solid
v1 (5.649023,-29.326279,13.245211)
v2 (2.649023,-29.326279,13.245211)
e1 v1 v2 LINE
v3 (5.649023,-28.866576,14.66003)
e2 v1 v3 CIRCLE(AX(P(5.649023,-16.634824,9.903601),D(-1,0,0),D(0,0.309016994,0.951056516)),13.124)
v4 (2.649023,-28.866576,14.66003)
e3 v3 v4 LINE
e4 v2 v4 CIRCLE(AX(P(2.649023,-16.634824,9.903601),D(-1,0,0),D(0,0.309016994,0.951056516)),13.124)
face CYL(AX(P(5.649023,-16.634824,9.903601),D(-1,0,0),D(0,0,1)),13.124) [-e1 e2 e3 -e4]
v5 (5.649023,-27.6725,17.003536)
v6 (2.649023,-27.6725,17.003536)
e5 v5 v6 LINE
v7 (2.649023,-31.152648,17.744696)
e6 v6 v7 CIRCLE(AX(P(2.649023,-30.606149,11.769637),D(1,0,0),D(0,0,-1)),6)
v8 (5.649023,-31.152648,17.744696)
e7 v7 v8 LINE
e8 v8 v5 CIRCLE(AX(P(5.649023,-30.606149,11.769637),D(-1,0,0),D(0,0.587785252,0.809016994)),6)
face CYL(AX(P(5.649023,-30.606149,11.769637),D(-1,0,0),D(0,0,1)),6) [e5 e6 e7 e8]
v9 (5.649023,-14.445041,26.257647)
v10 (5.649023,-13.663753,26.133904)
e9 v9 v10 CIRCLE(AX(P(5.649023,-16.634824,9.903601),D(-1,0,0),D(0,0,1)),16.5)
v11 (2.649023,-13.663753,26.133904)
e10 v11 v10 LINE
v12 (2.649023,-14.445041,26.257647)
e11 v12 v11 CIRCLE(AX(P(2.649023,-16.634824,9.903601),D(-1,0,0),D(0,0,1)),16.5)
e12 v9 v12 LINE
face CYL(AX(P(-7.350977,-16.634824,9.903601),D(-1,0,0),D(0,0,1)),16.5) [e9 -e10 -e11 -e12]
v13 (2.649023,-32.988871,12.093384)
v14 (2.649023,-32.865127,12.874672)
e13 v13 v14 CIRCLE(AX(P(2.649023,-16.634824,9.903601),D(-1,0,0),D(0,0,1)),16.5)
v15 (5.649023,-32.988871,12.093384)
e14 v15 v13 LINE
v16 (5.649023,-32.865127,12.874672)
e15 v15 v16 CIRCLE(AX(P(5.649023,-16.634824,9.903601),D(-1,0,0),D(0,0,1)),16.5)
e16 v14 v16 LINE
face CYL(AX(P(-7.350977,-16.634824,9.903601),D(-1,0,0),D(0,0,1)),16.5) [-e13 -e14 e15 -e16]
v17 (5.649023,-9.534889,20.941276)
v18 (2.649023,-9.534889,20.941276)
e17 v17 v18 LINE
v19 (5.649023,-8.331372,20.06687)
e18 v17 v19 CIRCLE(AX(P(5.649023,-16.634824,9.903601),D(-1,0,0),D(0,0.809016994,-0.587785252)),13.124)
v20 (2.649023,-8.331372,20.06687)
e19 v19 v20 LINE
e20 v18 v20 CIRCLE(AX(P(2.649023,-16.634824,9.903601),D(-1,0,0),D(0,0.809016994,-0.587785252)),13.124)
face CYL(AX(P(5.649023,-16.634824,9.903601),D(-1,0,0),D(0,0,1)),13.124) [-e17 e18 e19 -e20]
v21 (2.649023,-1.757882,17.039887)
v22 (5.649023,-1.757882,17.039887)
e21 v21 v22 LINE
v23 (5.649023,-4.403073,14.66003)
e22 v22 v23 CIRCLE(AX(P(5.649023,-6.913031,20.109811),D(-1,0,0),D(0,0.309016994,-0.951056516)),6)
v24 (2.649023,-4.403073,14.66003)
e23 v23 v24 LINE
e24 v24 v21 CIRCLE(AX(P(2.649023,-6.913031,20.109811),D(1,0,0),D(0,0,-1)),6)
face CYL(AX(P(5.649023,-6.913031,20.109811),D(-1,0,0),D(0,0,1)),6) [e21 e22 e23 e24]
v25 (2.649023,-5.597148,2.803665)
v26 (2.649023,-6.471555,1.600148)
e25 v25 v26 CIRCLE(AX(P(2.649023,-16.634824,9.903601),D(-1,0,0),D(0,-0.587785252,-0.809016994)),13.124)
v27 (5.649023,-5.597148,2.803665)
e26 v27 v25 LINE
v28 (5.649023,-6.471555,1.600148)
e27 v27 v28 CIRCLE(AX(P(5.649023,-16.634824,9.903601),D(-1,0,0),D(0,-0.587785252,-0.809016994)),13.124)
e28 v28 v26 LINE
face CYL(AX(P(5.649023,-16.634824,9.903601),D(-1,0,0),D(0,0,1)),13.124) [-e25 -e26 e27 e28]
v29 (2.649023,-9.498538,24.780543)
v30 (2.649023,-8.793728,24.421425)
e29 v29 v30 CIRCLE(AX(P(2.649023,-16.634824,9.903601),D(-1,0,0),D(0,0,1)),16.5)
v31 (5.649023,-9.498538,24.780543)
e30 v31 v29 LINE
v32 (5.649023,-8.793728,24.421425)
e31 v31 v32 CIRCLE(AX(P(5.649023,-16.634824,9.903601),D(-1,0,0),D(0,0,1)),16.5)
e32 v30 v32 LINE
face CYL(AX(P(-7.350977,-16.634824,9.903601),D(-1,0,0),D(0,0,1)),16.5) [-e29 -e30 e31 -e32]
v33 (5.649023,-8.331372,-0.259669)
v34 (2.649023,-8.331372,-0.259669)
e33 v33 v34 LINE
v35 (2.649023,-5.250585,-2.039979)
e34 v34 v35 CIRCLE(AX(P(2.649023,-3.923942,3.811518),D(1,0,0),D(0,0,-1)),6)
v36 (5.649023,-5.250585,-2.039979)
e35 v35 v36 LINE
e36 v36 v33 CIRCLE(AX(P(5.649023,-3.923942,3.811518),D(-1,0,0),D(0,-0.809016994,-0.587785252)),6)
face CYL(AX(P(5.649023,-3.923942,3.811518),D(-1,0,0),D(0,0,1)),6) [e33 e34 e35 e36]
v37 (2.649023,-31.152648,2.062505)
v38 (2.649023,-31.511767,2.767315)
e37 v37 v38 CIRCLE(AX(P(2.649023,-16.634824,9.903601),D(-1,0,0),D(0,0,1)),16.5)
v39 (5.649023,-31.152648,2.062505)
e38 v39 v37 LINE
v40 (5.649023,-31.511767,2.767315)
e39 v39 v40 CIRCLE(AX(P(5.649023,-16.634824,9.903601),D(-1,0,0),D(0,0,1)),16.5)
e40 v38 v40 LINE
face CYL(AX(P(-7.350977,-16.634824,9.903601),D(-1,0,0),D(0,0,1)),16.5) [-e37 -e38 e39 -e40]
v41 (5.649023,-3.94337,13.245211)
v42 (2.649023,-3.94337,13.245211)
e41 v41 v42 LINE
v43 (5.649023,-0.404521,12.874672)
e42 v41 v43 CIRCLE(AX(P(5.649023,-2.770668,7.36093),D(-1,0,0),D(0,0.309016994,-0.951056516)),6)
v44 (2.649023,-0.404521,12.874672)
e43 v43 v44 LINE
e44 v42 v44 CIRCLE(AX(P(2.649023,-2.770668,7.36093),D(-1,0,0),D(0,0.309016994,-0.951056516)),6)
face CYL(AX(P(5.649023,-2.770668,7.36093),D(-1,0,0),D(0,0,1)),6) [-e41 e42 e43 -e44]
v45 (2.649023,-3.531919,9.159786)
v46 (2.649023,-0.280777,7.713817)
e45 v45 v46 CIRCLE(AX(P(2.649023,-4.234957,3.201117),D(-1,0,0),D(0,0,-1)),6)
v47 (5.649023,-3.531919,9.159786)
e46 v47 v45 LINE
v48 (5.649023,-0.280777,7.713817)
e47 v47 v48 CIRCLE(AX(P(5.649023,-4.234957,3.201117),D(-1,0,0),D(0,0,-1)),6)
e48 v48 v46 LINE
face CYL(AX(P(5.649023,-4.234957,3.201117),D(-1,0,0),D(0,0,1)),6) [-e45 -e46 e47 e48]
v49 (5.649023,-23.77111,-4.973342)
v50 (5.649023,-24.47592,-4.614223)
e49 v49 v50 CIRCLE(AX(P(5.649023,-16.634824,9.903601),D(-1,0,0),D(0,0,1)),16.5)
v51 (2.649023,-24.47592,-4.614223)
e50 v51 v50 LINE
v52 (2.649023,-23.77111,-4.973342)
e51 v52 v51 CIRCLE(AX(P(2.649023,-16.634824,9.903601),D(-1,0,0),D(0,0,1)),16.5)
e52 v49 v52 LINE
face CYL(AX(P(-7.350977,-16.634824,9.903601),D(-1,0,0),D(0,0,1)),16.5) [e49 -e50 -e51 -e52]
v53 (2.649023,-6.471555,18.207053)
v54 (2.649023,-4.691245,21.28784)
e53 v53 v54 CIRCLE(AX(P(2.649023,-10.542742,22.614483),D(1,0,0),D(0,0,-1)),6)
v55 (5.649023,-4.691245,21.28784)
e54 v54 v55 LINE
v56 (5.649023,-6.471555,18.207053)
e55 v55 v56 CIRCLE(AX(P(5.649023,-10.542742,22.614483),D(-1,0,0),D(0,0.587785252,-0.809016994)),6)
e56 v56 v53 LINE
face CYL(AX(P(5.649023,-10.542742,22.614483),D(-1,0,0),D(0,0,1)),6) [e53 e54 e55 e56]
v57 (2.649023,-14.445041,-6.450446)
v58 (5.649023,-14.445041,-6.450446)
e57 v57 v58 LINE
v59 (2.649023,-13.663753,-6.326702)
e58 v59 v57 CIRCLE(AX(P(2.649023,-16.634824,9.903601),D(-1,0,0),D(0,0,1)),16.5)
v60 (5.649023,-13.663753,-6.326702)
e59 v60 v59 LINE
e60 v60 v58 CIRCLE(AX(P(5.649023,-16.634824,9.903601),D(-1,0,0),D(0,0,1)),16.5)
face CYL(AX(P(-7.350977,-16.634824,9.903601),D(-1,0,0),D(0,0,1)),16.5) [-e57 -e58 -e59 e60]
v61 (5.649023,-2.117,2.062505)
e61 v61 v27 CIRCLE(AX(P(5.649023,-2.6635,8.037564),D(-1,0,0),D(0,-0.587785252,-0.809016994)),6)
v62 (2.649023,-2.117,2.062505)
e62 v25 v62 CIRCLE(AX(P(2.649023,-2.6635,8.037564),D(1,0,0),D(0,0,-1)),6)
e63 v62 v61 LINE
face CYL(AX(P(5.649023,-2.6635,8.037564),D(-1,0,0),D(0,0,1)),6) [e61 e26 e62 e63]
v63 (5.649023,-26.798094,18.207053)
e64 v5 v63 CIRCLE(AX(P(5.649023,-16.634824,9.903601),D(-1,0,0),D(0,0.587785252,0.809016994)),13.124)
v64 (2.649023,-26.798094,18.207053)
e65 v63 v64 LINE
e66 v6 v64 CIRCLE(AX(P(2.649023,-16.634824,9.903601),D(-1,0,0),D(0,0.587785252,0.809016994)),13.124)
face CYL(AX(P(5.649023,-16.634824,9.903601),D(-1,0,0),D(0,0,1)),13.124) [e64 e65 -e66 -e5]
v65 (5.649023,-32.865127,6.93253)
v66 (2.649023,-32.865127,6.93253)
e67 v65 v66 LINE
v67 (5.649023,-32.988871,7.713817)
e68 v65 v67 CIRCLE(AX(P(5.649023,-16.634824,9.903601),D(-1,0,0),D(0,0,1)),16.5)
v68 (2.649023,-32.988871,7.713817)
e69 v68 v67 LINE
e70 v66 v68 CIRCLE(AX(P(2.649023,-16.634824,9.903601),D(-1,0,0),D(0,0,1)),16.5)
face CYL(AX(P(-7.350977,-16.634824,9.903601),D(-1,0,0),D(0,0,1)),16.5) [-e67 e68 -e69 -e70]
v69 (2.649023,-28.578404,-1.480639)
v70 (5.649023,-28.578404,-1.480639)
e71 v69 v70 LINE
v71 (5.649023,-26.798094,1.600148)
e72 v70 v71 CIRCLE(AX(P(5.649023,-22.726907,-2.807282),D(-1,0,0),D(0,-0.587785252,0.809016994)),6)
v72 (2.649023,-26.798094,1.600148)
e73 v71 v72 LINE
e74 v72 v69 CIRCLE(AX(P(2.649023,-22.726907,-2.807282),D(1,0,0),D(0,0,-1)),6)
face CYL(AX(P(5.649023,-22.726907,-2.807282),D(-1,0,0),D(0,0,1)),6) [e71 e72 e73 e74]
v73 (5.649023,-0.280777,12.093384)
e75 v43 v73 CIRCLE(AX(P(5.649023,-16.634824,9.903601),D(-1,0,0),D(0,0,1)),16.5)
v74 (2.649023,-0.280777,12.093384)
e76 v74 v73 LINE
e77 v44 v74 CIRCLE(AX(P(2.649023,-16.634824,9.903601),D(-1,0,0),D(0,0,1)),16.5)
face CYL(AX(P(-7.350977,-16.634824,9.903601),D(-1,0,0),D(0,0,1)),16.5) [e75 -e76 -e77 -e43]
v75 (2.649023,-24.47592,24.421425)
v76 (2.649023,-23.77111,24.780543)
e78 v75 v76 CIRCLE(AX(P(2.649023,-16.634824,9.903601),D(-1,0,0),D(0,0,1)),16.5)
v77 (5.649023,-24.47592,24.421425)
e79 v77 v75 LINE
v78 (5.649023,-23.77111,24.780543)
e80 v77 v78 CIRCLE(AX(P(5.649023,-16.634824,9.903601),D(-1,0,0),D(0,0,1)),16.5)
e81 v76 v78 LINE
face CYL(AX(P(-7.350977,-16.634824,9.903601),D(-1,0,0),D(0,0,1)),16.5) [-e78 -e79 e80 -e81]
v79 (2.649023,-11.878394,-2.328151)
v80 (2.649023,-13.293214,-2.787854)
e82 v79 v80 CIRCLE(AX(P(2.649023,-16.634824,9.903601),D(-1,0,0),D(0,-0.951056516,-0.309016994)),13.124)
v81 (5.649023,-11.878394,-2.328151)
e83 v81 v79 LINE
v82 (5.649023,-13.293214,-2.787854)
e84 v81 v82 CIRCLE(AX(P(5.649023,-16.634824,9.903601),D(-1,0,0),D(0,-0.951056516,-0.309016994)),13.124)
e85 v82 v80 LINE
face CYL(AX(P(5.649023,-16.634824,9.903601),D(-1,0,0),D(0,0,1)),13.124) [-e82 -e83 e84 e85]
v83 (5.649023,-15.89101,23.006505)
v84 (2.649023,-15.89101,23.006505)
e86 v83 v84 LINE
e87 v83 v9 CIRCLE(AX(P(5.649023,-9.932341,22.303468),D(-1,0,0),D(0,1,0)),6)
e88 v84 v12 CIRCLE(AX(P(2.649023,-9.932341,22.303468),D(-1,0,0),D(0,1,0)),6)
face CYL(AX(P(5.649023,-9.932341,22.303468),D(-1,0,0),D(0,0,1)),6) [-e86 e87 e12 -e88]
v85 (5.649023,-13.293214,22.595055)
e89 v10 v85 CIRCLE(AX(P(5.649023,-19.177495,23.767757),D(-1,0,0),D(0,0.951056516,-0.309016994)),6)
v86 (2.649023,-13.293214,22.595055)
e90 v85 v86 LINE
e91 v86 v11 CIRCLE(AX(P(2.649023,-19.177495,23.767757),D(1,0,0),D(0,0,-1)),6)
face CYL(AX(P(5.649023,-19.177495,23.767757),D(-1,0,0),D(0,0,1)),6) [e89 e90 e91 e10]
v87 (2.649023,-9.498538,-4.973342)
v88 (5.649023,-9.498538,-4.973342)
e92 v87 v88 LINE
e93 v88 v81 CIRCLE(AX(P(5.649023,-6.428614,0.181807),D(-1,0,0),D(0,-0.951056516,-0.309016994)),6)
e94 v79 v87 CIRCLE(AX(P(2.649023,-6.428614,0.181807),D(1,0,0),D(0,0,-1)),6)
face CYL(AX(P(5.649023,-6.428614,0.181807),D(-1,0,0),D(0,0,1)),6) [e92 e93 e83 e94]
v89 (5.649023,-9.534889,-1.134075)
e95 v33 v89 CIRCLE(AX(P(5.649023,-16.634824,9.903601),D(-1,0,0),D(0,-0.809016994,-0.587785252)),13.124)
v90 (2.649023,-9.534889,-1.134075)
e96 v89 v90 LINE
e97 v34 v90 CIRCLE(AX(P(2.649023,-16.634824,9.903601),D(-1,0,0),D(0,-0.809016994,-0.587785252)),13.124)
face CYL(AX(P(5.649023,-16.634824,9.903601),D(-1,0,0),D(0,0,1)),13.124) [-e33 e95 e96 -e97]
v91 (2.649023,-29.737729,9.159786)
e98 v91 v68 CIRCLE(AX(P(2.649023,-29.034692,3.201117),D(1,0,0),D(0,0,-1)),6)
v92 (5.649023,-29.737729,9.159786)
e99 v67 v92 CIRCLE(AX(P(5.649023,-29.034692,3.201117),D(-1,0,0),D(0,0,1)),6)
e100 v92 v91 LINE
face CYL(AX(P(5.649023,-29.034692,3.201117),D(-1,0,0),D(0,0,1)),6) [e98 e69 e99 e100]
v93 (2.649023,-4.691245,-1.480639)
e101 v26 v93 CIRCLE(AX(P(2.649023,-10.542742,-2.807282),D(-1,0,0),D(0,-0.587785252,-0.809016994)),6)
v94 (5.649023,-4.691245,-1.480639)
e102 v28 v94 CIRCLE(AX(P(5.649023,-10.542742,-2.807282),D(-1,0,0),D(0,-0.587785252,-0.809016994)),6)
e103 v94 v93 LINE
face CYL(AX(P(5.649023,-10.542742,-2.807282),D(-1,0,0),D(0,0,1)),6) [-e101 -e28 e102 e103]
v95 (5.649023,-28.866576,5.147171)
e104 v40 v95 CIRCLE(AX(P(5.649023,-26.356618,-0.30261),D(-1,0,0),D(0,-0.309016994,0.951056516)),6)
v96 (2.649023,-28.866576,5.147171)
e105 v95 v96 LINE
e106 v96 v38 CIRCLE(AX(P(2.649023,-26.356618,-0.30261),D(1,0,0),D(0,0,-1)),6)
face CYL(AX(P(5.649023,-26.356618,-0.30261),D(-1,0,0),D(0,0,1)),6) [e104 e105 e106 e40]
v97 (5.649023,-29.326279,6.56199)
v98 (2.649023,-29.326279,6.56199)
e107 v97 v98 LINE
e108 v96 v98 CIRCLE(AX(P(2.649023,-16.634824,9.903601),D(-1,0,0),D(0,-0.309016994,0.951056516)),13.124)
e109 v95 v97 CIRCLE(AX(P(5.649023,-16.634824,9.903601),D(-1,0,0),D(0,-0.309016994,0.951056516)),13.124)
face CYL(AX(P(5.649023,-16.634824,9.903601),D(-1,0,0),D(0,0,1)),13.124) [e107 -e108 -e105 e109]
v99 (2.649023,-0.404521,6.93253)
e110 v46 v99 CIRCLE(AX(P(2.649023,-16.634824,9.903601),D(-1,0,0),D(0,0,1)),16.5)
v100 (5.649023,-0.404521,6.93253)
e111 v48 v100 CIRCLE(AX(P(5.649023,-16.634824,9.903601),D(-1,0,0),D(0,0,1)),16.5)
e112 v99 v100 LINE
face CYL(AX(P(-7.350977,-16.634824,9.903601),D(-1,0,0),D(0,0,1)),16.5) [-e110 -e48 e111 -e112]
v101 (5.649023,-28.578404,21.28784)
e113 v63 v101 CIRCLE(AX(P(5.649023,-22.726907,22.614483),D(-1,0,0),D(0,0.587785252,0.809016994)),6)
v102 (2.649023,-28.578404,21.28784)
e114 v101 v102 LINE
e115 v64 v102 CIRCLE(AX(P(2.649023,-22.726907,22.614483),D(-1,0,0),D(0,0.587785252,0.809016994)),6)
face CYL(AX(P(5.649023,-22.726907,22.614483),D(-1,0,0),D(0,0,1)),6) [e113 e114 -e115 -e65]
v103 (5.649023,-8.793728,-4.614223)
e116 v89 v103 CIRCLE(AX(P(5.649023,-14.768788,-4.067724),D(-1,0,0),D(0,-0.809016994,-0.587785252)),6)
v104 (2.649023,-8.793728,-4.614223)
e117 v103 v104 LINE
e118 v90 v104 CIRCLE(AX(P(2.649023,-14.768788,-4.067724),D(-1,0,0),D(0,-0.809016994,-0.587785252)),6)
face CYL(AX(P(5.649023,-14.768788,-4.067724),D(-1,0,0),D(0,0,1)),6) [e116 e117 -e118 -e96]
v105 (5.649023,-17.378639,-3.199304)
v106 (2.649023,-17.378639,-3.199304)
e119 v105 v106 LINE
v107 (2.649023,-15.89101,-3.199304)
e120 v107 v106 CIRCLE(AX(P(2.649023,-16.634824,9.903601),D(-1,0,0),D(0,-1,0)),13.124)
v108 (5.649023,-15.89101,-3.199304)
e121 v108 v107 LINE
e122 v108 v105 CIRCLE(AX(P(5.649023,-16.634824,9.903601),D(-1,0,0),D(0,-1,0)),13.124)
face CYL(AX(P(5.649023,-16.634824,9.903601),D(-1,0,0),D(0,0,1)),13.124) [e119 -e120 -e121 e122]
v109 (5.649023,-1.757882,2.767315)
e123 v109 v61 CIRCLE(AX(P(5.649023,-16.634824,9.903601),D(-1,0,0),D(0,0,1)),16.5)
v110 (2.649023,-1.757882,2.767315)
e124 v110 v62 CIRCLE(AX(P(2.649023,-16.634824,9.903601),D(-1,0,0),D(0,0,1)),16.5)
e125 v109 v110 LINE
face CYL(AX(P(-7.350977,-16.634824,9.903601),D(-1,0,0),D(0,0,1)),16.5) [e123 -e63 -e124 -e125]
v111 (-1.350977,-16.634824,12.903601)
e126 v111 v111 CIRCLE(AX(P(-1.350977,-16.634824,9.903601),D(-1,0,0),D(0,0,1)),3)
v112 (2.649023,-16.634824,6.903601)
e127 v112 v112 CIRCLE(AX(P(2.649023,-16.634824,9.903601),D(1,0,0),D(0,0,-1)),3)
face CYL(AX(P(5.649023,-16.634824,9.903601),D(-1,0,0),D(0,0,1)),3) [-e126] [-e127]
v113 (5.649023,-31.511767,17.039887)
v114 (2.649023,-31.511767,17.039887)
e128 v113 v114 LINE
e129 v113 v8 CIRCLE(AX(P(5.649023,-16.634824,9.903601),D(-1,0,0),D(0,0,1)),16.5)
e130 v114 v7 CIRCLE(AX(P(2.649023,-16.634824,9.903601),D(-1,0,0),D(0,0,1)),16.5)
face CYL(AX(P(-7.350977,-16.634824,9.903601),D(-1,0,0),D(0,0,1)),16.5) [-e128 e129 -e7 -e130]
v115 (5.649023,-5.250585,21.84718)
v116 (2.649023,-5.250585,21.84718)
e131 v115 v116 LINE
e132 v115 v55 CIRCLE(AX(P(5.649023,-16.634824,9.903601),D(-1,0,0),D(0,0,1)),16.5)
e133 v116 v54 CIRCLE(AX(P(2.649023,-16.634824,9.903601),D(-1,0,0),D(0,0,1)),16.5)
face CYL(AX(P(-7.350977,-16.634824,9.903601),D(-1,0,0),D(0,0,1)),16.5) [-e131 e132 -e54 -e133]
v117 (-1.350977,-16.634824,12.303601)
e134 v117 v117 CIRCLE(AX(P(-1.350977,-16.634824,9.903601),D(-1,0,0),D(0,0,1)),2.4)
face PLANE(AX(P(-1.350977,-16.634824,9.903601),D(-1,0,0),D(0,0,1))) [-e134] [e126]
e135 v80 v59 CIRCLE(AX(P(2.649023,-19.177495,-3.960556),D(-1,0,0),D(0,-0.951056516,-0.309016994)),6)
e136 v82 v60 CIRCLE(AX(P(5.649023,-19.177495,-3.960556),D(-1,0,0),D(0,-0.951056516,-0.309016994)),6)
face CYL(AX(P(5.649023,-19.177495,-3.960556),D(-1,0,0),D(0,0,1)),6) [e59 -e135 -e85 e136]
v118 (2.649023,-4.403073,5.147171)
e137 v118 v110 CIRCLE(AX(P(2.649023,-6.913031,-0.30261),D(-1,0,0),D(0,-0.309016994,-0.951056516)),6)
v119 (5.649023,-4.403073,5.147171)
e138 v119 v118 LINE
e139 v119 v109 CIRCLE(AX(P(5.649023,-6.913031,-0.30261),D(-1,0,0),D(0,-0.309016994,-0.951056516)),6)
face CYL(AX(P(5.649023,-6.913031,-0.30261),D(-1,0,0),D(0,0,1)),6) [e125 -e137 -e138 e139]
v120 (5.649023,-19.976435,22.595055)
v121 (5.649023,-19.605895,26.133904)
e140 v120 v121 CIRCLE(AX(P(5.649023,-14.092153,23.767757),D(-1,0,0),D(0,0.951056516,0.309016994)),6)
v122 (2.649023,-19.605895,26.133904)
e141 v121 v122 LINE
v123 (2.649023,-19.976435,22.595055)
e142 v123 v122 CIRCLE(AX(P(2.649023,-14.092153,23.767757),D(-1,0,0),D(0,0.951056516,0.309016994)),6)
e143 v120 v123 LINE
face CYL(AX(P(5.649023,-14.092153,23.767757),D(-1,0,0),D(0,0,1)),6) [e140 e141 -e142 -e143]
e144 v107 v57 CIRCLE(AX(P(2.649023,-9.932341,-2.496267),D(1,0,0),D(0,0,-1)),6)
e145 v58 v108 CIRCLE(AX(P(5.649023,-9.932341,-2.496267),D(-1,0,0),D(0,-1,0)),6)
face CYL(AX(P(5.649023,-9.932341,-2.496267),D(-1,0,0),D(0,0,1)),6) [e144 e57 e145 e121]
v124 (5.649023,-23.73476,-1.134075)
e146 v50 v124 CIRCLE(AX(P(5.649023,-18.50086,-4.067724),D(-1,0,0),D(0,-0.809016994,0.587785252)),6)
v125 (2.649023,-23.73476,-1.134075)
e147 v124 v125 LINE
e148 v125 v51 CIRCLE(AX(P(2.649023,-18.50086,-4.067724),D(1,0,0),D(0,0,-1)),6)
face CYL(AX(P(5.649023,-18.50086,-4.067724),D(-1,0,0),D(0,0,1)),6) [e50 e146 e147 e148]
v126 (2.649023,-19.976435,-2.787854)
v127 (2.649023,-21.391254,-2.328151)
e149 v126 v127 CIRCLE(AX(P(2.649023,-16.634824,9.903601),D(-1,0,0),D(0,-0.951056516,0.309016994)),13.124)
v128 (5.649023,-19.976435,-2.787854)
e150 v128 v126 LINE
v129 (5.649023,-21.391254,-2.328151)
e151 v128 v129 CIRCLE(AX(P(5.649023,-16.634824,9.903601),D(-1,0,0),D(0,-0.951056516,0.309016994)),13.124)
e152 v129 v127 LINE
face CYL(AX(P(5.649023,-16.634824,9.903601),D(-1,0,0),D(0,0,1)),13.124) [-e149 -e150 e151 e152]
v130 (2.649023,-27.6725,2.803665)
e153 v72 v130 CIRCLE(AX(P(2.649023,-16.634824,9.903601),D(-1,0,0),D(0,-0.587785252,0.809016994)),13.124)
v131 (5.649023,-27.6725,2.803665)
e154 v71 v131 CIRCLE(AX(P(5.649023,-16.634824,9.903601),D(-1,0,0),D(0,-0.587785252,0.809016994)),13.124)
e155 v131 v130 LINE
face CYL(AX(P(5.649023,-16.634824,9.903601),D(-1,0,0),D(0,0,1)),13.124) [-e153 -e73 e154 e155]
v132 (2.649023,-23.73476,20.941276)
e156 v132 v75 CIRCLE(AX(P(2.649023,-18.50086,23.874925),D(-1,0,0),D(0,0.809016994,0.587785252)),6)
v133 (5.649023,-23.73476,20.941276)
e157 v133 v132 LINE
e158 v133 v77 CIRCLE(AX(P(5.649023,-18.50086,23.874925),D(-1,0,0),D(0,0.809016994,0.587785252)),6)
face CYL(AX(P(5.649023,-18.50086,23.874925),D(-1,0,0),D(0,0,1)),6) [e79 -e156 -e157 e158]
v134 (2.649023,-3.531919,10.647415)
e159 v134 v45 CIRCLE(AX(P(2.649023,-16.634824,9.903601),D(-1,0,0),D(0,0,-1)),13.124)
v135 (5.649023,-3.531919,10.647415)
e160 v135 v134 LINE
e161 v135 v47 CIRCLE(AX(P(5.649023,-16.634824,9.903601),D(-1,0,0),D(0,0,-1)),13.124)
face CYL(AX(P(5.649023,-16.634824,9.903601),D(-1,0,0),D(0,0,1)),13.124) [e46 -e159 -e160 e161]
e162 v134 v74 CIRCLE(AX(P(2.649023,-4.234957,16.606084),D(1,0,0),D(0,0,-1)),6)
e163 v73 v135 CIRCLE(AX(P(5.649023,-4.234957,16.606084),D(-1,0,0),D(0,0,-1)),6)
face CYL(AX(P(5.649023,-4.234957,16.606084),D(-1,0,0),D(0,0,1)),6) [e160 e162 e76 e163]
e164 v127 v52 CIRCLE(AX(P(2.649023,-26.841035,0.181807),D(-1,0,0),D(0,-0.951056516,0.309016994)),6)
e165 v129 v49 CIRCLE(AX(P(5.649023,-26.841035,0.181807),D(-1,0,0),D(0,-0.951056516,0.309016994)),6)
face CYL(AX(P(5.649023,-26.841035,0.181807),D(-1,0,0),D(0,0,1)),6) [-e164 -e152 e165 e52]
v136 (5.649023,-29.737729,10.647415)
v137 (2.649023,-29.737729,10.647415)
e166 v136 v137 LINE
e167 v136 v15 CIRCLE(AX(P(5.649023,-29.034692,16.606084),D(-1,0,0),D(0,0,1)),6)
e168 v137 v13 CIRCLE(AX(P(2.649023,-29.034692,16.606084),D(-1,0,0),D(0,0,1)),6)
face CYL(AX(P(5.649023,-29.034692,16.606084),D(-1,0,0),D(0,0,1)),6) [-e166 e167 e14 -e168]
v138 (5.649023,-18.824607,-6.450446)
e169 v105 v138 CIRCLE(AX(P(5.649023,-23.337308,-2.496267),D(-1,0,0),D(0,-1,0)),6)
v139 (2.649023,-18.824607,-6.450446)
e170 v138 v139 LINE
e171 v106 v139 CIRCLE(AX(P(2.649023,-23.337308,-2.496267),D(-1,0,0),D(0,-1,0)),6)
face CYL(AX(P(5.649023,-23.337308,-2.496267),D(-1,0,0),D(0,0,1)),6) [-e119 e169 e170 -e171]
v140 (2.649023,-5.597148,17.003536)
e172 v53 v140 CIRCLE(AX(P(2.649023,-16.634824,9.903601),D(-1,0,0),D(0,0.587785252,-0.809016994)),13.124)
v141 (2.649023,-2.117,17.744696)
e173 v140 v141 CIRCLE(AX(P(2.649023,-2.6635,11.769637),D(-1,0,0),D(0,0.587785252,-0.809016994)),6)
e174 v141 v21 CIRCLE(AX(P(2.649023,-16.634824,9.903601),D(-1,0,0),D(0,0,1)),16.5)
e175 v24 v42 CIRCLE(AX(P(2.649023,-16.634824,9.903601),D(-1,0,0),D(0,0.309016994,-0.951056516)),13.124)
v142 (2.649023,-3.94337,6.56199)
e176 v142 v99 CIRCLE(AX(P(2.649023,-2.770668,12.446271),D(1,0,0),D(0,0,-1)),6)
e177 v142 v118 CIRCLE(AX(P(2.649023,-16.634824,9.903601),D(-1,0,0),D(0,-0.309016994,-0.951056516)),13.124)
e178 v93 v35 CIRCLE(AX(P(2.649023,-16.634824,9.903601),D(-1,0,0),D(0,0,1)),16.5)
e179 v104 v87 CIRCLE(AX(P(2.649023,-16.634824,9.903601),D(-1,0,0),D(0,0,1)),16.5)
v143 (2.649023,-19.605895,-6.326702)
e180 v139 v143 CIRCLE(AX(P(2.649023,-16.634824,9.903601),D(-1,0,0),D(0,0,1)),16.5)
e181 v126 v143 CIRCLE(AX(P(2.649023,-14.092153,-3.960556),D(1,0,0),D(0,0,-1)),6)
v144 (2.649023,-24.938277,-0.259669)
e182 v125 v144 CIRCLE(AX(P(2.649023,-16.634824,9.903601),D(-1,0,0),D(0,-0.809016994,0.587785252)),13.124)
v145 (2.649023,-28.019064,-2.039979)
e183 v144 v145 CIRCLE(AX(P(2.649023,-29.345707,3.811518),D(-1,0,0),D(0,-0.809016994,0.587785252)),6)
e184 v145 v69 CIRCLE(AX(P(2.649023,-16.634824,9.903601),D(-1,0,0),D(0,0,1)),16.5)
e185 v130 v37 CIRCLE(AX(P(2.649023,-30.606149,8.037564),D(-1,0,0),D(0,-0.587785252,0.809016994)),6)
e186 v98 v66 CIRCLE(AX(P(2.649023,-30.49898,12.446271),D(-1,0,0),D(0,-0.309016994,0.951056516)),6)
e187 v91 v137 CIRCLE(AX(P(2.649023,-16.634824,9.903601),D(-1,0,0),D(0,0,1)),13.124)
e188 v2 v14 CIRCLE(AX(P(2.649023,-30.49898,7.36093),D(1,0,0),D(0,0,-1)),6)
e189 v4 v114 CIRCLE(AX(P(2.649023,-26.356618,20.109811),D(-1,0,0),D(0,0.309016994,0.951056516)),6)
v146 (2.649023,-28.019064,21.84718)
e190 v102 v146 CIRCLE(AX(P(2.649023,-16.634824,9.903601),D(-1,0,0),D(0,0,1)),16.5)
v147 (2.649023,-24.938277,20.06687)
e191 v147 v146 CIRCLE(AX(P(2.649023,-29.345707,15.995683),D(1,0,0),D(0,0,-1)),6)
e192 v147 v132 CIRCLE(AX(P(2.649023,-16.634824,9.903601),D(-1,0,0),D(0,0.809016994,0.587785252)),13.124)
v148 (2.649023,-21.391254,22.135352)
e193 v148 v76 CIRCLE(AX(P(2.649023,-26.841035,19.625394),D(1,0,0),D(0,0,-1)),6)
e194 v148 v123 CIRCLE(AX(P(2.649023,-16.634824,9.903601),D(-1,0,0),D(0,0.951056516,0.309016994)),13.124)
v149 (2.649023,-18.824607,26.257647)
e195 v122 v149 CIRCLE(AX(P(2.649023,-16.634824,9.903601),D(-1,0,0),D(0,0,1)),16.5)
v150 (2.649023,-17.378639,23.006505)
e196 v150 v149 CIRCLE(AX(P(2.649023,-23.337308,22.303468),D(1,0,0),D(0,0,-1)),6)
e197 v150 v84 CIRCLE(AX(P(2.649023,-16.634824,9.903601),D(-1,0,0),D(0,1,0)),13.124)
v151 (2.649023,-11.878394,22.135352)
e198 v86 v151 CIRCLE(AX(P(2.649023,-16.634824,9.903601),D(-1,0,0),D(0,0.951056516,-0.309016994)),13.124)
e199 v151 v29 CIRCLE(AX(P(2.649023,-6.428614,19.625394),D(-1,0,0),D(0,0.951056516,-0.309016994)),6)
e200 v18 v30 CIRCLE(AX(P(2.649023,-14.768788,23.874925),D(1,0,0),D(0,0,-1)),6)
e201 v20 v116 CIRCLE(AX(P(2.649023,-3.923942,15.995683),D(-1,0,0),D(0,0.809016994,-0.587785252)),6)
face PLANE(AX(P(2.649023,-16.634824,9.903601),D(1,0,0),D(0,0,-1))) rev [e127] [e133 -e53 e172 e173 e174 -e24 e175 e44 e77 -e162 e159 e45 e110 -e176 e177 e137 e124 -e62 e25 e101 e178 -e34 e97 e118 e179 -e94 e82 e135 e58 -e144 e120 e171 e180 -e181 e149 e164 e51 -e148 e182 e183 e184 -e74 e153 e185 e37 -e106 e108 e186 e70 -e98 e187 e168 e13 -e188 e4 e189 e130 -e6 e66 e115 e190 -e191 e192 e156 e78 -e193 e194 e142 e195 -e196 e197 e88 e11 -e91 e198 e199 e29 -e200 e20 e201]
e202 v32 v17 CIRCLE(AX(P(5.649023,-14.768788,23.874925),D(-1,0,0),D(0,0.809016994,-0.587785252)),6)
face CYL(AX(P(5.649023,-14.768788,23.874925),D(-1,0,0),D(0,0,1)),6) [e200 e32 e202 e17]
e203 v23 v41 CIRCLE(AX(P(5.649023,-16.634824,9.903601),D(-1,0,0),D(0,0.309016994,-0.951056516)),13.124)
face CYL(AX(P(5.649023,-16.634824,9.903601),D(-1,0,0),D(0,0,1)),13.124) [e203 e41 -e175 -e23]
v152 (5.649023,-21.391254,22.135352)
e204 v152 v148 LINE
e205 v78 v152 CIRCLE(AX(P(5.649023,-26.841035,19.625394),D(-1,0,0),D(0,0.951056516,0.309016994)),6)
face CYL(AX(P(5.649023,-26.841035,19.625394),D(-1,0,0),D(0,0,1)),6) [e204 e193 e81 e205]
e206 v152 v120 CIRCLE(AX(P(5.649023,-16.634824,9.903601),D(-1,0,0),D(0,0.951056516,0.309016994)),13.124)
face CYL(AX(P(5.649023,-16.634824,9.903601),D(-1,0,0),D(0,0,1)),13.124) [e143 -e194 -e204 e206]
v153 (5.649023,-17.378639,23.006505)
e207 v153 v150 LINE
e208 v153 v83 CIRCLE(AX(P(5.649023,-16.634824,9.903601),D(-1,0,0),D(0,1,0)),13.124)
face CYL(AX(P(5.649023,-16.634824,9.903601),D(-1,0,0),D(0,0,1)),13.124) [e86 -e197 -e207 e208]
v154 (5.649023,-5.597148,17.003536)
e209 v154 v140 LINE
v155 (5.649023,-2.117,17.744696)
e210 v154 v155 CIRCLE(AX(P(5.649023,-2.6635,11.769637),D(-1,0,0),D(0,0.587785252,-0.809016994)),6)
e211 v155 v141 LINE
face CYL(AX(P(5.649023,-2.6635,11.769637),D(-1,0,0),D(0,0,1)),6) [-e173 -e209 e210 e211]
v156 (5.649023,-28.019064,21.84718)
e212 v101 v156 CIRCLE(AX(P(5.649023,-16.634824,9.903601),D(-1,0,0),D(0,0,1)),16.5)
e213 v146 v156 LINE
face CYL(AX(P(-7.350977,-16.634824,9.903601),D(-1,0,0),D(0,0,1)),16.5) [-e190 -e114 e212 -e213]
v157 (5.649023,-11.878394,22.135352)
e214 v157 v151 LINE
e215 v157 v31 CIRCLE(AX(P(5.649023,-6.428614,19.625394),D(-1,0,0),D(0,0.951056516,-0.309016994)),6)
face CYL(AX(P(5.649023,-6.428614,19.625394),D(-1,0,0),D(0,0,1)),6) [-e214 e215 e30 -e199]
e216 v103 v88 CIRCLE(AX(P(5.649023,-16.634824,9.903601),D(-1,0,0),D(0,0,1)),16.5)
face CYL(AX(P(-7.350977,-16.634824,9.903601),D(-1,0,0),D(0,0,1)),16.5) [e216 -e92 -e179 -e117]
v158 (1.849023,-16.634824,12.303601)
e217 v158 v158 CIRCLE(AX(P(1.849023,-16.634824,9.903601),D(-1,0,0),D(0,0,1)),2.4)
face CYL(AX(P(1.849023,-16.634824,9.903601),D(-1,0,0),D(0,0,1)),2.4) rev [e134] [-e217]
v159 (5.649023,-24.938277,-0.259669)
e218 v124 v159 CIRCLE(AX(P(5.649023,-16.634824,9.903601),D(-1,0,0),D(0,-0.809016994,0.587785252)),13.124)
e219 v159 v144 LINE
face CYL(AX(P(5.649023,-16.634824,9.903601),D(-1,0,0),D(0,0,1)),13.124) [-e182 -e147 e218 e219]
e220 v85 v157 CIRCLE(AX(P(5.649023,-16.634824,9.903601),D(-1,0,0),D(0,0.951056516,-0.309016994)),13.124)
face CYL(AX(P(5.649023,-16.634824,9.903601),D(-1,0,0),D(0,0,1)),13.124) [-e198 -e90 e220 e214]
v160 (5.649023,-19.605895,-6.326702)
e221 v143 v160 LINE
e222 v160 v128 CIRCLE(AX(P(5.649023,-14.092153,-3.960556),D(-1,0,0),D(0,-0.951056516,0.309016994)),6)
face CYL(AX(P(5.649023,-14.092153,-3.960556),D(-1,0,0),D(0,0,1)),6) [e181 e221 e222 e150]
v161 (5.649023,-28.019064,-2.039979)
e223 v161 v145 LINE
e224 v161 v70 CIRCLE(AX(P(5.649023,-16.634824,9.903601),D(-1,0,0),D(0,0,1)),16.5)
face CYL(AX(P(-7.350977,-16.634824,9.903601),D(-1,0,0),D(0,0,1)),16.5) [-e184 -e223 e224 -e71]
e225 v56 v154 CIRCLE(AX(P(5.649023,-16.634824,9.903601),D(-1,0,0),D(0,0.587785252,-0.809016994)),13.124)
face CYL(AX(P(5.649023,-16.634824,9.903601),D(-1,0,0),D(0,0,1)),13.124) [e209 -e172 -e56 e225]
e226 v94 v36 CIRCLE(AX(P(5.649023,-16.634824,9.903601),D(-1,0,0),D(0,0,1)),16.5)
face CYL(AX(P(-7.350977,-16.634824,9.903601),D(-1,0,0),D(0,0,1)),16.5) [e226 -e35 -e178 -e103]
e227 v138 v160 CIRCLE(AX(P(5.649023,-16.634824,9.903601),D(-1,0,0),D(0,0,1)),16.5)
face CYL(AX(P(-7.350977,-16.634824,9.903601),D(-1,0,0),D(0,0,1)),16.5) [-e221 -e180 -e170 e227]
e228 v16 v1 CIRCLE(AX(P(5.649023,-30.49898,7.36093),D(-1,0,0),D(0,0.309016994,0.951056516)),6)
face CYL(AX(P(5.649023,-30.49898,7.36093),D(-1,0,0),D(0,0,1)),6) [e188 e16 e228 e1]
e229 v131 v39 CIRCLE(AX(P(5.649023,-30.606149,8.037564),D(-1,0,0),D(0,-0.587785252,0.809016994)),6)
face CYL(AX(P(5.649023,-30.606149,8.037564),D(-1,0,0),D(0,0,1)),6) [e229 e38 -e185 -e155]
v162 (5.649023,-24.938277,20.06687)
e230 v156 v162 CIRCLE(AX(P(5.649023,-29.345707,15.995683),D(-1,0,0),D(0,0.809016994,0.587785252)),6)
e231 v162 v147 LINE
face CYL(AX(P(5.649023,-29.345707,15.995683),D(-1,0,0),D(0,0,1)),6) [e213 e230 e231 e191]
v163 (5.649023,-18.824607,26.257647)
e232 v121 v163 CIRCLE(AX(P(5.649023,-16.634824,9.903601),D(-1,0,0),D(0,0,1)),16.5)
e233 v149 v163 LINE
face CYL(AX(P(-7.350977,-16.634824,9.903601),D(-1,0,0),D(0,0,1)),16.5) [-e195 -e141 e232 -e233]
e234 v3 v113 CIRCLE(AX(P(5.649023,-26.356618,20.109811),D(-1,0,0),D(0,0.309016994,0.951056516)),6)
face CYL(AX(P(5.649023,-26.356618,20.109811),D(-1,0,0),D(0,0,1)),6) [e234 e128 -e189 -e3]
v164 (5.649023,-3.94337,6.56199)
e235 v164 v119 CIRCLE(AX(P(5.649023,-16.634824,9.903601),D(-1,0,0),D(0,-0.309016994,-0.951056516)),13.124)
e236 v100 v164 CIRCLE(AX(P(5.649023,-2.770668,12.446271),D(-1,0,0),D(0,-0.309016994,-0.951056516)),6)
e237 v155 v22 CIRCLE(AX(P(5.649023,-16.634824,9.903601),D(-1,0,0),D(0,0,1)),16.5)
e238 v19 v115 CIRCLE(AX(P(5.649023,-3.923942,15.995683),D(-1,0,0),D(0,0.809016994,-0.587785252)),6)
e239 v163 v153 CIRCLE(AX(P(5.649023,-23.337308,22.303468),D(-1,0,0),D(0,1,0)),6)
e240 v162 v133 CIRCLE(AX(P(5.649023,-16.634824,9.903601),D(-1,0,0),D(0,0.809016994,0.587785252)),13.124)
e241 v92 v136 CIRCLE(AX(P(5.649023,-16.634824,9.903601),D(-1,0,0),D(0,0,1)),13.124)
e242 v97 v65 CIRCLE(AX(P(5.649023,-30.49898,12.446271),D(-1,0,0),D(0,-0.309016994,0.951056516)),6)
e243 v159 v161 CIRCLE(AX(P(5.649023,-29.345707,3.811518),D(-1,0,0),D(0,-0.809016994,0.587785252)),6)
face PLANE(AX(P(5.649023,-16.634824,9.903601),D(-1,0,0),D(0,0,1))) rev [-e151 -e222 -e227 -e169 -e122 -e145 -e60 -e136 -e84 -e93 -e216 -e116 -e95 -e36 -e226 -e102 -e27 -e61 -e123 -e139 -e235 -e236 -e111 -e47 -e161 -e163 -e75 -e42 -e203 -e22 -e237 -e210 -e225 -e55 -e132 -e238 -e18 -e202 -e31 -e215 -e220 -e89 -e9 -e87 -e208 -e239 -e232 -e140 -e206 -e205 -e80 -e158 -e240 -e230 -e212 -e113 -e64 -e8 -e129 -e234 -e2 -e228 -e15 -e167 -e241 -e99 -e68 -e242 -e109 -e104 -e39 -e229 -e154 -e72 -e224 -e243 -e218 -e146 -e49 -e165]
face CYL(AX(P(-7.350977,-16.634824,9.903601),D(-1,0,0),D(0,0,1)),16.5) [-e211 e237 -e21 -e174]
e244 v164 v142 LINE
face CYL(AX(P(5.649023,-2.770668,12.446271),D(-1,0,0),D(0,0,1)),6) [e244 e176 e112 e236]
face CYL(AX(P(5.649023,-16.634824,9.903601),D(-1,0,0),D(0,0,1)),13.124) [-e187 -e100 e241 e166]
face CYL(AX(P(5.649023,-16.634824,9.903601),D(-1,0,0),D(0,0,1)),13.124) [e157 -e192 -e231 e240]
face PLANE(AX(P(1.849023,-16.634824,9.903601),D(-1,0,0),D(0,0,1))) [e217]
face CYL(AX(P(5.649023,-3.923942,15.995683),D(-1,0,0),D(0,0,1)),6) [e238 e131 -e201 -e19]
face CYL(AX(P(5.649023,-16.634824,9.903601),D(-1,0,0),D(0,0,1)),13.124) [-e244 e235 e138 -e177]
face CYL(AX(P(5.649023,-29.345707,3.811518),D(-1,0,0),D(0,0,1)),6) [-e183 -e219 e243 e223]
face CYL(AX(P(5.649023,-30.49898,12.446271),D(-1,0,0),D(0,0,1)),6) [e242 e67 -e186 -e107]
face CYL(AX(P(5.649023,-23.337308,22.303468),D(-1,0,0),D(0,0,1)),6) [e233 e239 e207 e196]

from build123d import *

# Parameters (mm, degrees)
ISO_START                                 = 2.649023341
ISO_SPUR_GEAR_1_5M_20T_20PA_3FW_2_R       = 0.4
ISO_SPUR_GEAR_1_5M_20T_20PA_3FW_S20_DEPTH = 3
BOSS_EXTRUDE1_DEPTH                       = 4
BOSS_EXTRUDE1_DEPTH_BACK                  = 3
SKETCH1_R                                 = 3
SKETCH2_R                                 = 2.4
CUT_EXTRUDE1_DEPTH                        = 3.2


# Read off the part's stored shape, not the designer's step: ISO - Spur gear 1.5M 20T 20PA 3FW ---S20A75H50L0.8N
with BuildPart() as part:
    # ISO - Spur gear 1.5M 20T 20PA 3FW -- 2 → ISO - Spur gear 1.5M 20T 20PA 3FW ---S20 (new body)
    with BuildSketch(Plane.YZ.offset(ISO_START)):
        with BuildLine():
            ThreePointArc((-13.663753379, 26.133903668), (-14.053655616, 26.200458221), (-14.445041168, 26.257647498))
            ThreePointArc((-14.445041168, 26.257647498), (-15.414573535, 24.741730478), (-15.891009909, 23.006505477))
            ThreePointArc((-15.891009909, 23.006505477), (-16.634824289, 23.027600602), (-17.37863867, 23.006505477))
            ThreePointArc((-17.37863867, 23.006505477), (-17.855075045, 24.741730477), (-18.824607411, 26.257647498))
            ThreePointArc((-18.824607411, 26.257647498), (-19.215992963, 26.200458221), (-19.6058952, 26.133903668))
            ThreePointArc((-19.6058952, 26.133903668), (-20.059531154, 24.39257893), (-19.976435058, 22.59505495))
            ThreePointArc((-19.976435058, 22.59505495), (-20.690363323, 22.385266321), (-21.391254085, 22.135352381))
            ThreePointArc((-21.391254085, 22.135352381), (-22.380586018, 23.638422489), (-23.771110214, 24.780543271))
            ThreePointArc((-23.771110214, 24.780543271), (-24.125667535, 24.605208251), (-24.475920111, 24.421424692))
            ThreePointArc((-24.475920111, 24.421424692), (-24.369254604, 22.625145234), (-23.734760063, 20.941276444))
            ThreePointArc((-23.734760063, 20.941276444), (-24.348917941, 20.521139636), (-24.938277012, 20.066870198))
            ThreePointArc((-24.938277012, 20.066870198), (-26.343661801, 21.190654438), (-28.01906363, 21.847180243))
            ThreePointArc((-28.01906363, 21.847180243), (-28.302086179, 21.570862491), (-28.578403931, 21.287839942))
            ThreePointArc((-28.578403931, 21.287839942), (-27.921878126, 19.612438113), (-26.798093886, 18.207053324))
            ThreePointArc((-26.798093886, 18.207053324), (-27.252363324, 17.617694253), (-27.672500133, 17.003536375))
            ThreePointArc((-27.672500133, 17.003536375), (-29.356368922, 17.638030916), (-31.15264838, 17.744696423))
            ThreePointArc((-31.15264838, 17.744696423), (-31.336431939, 17.394443847), (-31.511766959, 17.039886526))
            ThreePointArc((-31.511766959, 17.039886526), (-30.369646177, 15.64936233), (-28.866576069, 14.660030397))
            ThreePointArc((-28.866576069, 14.660030397), (-29.116490009, 13.959139635), (-29.326278638, 13.24521137))
            ThreePointArc((-29.326278638, 13.24521137), (-31.123802618, 13.328307466), (-32.865127356, 12.874671512))
            ThreePointArc((-32.865127356, 12.874671512), (-32.931681909, 12.484769275), (-32.988871186, 12.093383723))
            ThreePointArc((-32.988871186, 12.093383723), (-31.472954165, 11.123851357), (-29.737729165, 10.647414982))
            ThreePointArc((-29.737729165, 10.647414982), (-29.75882429, 9.903600602), (-29.737729165, 9.159786221))
            ThreePointArc((-29.737729165, 9.159786221), (-31.472954166, 8.683349847), (-32.988871186, 7.71381748))
            ThreePointArc((-32.988871186, 7.71381748), (-32.931681909, 7.322431928), (-32.865127356, 6.932529691))
            ThreePointArc((-32.865127356, 6.932529691), (-31.123802618, 6.478893737), (-29.326278638, 6.561989833))
            ThreePointArc((-29.326278638, 6.561989833), (-29.116490009, 5.848061568), (-28.866576069, 5.147170806))
            ThreePointArc((-28.866576069, 5.147170806), (-30.369646177, 4.157838873), (-31.511766959, 2.767314677))
            ThreePointArc((-31.511766959, 2.767314677), (-31.336431939, 2.412757356), (-31.15264838, 2.06250478))
            ThreePointArc((-31.15264838, 2.06250478), (-29.356368922, 2.169170287), (-27.672500133, 2.803664828))
            ThreePointArc((-27.672500133, 2.803664828), (-27.252363324, 2.18950695), (-26.798093886, 1.600147879))
            ThreePointArc((-26.798093886, 1.600147879), (-27.921878126, 0.19476309), (-28.578403931, -1.480638739))
            ThreePointArc((-28.578403931, -1.480638739), (-28.302086179, -1.763661288), (-28.01906363, -2.03997904))
            ThreePointArc((-28.01906363, -2.03997904), (-26.343661801, -1.383453235), (-24.938277012, -0.259668995))
            ThreePointArc((-24.938277012, -0.259668995), (-24.348917941, -0.713938433), (-23.734760063, -1.134075241))
            ThreePointArc((-23.734760063, -1.134075241), (-24.369254604, -2.817944031), (-24.475920111, -4.614223489))
            ThreePointArc((-24.475920111, -4.614223489), (-24.125667535, -4.798007048), (-23.771110214, -4.973342068))
            ThreePointArc((-23.771110214, -4.973342068), (-22.380586018, -3.831221286), (-21.391254085, -2.328151178))
            ThreePointArc((-21.391254085, -2.328151178), (-20.690363323, -2.578065118), (-19.976435058, -2.787853747))
            ThreePointArc((-19.976435058, -2.787853747), (-20.059531154, -4.585377727), (-19.6058952, -6.326702465))
            ThreePointArc((-19.6058952, -6.326702465), (-19.215992963, -6.393257018), (-18.824607411, -6.450446295))
            ThreePointArc((-18.824607411, -6.450446295), (-17.855075045, -4.934529274), (-17.37863867, -3.199304274))
            ThreePointArc((-17.37863867, -3.199304274), (-16.634824289, -3.220399398), (-15.891009909, -3.199304274))
            ThreePointArc((-15.891009909, -3.199304274), (-15.414573535, -4.934529275), (-14.445041168, -6.450446295))
            ThreePointArc((-14.445041168, -6.450446295), (-14.053655616, -6.393257018), (-13.663753379, -6.326702465))
            ThreePointArc((-13.663753379, -6.326702465), (-13.210117425, -4.585377727), (-13.293213521, -2.787853747))
            ThreePointArc((-13.293213521, -2.787853747), (-12.579285256, -2.578065118), (-11.878394494, -2.328151178))
            ThreePointArc((-11.878394494, -2.328151178), (-10.889062561, -3.831221286), (-9.498538365, -4.973342068))
            ThreePointArc((-9.498538365, -4.973342068), (-9.143981044, -4.798007048), (-8.793728468, -4.614223489))
            ThreePointArc((-8.793728468, -4.614223489), (-8.900393975, -2.817944031), (-9.534888516, -1.134075241))
            ThreePointArc((-9.534888516, -1.134075241), (-8.920730638, -0.713938433), (-8.331371567, -0.259668995))
            ThreePointArc((-8.331371567, -0.259668995), (-6.925986778, -1.383453235), (-5.250584949, -2.03997904))
            ThreePointArc((-5.250584949, -2.03997904), (-4.9675624, -1.763661288), (-4.691244648, -1.480638739))
            ThreePointArc((-4.691244648, -1.480638739), (-5.347770453, 0.19476309), (-6.471554693, 1.600147879))
            ThreePointArc((-6.471554693, 1.600147879), (-6.017285255, 2.18950695), (-5.597148447, 2.803664828))
            ThreePointArc((-5.597148447, 2.803664828), (-3.913279657, 2.169170287), (-2.117000199, 2.06250478))
            ThreePointArc((-2.117000199, 2.06250478), (-1.93321664, 2.412757356), (-1.75788162, 2.767314677))
            ThreePointArc((-1.75788162, 2.767314677), (-2.900002402, 4.157838873), (-4.40307251, 5.147170806))
            ThreePointArc((-4.40307251, 5.147170806), (-4.15315857, 5.848061568), (-3.943369941, 6.561989833))
            ThreePointArc((-3.943369941, 6.561989833), (-2.145845961, 6.478893737), (-0.404521223, 6.932529691))
            ThreePointArc((-0.404521223, 6.932529691), (-0.33796667, 7.322431928), (-0.280777393, 7.71381748))
            ThreePointArc((-0.280777393, 7.71381748), (-1.796694413, 8.683349847), (-3.531919414, 9.159786221))
            ThreePointArc((-3.531919414, 9.159786221), (-3.51082429, 9.903600601), (-3.531919414, 10.647414982))
            ThreePointArc((-3.531919414, 10.647414982), (-1.796694414, 11.123851357), (-0.280777393, 12.093383723))
            ThreePointArc((-0.280777393, 12.093383723), (-0.33796667, 12.484769275), (-0.404521223, 12.874671512))
            ThreePointArc((-0.404521223, 12.874671512), (-2.145845961, 13.328307466), (-3.943369941, 13.24521137))
            ThreePointArc((-3.943369941, 13.24521137), (-4.15315857, 13.959139635), (-4.40307251, 14.660030397))
            ThreePointArc((-4.40307251, 14.660030397), (-2.900002402, 15.64936233), (-1.75788162, 17.039886526))
            ThreePointArc((-1.75788162, 17.039886526), (-1.93321664, 17.394443847), (-2.117000199, 17.744696423))
            ThreePointArc((-2.117000199, 17.744696423), (-3.913279657, 17.638030916), (-5.597148447, 17.003536375))
            ThreePointArc((-5.597148447, 17.003536375), (-6.017285255, 17.617694253), (-6.471554693, 18.207053324))
            ThreePointArc((-6.471554693, 18.207053324), (-5.347770453, 19.612438113), (-4.691244648, 21.287839942))
            ThreePointArc((-4.691244648, 21.287839942), (-4.9675624, 21.570862491), (-5.250584949, 21.847180243))
            ThreePointArc((-5.250584949, 21.847180243), (-6.925986778, 21.190654438), (-8.331371567, 20.066870198))
            ThreePointArc((-8.331371567, 20.066870198), (-8.920730638, 20.521139636), (-9.534888516, 20.941276444))
            ThreePointArc((-9.534888516, 20.941276444), (-8.900393975, 22.625145234), (-8.793728468, 24.421424692))
            ThreePointArc((-8.793728468, 24.421424692), (-9.143981044, 24.605208251), (-9.498538365, 24.780543271))
            ThreePointArc((-9.498538365, 24.780543271), (-10.889062561, 23.638422489), (-11.878394494, 22.135352381))
            ThreePointArc((-11.878394494, 22.135352381), (-12.579285256, 22.385266321), (-13.293213521, 22.59505495))
            ThreePointArc((-13.293213521, 22.59505495), (-13.210117425, 24.39257893), (-13.663753379, 26.133903668))
        make_face()
        with Locations((-16.63482429, 9.903600602)):
            Circle(ISO_SPUR_GEAR_1_5M_20T_20PA_3FW_2_R, mode=Mode.SUBTRACT)
    extrude(amount=ISO_SPUR_GEAR_1_5M_20T_20PA_3FW_S20_DEPTH)

    # Sketch1 → Boss-Extrude1 (add, two sides: drawn at the far end of the back side and taken through both)
    with BuildSketch(Plane.ZY.offset(-2.649023341).offset(-BOSS_EXTRUDE1_DEPTH_BACK)):
        with Locations((9.903600602, -16.63482429)):
            Circle(SKETCH1_R)
    extrude(amount=BOSS_EXTRUDE1_DEPTH + BOSS_EXTRUDE1_DEPTH_BACK)

    # Sketch2 → Cut-Extrude1 (cut)
    with BuildSketch(Plane.ZY.offset(1.350976659)):
        with Locations((9.903600602, -16.63482429)):
            Circle(SKETCH2_R)
    extrude(amount=-CUT_EXTRUDE1_DEPTH, mode=Mode.SUBTRACT)


solid = part.part
